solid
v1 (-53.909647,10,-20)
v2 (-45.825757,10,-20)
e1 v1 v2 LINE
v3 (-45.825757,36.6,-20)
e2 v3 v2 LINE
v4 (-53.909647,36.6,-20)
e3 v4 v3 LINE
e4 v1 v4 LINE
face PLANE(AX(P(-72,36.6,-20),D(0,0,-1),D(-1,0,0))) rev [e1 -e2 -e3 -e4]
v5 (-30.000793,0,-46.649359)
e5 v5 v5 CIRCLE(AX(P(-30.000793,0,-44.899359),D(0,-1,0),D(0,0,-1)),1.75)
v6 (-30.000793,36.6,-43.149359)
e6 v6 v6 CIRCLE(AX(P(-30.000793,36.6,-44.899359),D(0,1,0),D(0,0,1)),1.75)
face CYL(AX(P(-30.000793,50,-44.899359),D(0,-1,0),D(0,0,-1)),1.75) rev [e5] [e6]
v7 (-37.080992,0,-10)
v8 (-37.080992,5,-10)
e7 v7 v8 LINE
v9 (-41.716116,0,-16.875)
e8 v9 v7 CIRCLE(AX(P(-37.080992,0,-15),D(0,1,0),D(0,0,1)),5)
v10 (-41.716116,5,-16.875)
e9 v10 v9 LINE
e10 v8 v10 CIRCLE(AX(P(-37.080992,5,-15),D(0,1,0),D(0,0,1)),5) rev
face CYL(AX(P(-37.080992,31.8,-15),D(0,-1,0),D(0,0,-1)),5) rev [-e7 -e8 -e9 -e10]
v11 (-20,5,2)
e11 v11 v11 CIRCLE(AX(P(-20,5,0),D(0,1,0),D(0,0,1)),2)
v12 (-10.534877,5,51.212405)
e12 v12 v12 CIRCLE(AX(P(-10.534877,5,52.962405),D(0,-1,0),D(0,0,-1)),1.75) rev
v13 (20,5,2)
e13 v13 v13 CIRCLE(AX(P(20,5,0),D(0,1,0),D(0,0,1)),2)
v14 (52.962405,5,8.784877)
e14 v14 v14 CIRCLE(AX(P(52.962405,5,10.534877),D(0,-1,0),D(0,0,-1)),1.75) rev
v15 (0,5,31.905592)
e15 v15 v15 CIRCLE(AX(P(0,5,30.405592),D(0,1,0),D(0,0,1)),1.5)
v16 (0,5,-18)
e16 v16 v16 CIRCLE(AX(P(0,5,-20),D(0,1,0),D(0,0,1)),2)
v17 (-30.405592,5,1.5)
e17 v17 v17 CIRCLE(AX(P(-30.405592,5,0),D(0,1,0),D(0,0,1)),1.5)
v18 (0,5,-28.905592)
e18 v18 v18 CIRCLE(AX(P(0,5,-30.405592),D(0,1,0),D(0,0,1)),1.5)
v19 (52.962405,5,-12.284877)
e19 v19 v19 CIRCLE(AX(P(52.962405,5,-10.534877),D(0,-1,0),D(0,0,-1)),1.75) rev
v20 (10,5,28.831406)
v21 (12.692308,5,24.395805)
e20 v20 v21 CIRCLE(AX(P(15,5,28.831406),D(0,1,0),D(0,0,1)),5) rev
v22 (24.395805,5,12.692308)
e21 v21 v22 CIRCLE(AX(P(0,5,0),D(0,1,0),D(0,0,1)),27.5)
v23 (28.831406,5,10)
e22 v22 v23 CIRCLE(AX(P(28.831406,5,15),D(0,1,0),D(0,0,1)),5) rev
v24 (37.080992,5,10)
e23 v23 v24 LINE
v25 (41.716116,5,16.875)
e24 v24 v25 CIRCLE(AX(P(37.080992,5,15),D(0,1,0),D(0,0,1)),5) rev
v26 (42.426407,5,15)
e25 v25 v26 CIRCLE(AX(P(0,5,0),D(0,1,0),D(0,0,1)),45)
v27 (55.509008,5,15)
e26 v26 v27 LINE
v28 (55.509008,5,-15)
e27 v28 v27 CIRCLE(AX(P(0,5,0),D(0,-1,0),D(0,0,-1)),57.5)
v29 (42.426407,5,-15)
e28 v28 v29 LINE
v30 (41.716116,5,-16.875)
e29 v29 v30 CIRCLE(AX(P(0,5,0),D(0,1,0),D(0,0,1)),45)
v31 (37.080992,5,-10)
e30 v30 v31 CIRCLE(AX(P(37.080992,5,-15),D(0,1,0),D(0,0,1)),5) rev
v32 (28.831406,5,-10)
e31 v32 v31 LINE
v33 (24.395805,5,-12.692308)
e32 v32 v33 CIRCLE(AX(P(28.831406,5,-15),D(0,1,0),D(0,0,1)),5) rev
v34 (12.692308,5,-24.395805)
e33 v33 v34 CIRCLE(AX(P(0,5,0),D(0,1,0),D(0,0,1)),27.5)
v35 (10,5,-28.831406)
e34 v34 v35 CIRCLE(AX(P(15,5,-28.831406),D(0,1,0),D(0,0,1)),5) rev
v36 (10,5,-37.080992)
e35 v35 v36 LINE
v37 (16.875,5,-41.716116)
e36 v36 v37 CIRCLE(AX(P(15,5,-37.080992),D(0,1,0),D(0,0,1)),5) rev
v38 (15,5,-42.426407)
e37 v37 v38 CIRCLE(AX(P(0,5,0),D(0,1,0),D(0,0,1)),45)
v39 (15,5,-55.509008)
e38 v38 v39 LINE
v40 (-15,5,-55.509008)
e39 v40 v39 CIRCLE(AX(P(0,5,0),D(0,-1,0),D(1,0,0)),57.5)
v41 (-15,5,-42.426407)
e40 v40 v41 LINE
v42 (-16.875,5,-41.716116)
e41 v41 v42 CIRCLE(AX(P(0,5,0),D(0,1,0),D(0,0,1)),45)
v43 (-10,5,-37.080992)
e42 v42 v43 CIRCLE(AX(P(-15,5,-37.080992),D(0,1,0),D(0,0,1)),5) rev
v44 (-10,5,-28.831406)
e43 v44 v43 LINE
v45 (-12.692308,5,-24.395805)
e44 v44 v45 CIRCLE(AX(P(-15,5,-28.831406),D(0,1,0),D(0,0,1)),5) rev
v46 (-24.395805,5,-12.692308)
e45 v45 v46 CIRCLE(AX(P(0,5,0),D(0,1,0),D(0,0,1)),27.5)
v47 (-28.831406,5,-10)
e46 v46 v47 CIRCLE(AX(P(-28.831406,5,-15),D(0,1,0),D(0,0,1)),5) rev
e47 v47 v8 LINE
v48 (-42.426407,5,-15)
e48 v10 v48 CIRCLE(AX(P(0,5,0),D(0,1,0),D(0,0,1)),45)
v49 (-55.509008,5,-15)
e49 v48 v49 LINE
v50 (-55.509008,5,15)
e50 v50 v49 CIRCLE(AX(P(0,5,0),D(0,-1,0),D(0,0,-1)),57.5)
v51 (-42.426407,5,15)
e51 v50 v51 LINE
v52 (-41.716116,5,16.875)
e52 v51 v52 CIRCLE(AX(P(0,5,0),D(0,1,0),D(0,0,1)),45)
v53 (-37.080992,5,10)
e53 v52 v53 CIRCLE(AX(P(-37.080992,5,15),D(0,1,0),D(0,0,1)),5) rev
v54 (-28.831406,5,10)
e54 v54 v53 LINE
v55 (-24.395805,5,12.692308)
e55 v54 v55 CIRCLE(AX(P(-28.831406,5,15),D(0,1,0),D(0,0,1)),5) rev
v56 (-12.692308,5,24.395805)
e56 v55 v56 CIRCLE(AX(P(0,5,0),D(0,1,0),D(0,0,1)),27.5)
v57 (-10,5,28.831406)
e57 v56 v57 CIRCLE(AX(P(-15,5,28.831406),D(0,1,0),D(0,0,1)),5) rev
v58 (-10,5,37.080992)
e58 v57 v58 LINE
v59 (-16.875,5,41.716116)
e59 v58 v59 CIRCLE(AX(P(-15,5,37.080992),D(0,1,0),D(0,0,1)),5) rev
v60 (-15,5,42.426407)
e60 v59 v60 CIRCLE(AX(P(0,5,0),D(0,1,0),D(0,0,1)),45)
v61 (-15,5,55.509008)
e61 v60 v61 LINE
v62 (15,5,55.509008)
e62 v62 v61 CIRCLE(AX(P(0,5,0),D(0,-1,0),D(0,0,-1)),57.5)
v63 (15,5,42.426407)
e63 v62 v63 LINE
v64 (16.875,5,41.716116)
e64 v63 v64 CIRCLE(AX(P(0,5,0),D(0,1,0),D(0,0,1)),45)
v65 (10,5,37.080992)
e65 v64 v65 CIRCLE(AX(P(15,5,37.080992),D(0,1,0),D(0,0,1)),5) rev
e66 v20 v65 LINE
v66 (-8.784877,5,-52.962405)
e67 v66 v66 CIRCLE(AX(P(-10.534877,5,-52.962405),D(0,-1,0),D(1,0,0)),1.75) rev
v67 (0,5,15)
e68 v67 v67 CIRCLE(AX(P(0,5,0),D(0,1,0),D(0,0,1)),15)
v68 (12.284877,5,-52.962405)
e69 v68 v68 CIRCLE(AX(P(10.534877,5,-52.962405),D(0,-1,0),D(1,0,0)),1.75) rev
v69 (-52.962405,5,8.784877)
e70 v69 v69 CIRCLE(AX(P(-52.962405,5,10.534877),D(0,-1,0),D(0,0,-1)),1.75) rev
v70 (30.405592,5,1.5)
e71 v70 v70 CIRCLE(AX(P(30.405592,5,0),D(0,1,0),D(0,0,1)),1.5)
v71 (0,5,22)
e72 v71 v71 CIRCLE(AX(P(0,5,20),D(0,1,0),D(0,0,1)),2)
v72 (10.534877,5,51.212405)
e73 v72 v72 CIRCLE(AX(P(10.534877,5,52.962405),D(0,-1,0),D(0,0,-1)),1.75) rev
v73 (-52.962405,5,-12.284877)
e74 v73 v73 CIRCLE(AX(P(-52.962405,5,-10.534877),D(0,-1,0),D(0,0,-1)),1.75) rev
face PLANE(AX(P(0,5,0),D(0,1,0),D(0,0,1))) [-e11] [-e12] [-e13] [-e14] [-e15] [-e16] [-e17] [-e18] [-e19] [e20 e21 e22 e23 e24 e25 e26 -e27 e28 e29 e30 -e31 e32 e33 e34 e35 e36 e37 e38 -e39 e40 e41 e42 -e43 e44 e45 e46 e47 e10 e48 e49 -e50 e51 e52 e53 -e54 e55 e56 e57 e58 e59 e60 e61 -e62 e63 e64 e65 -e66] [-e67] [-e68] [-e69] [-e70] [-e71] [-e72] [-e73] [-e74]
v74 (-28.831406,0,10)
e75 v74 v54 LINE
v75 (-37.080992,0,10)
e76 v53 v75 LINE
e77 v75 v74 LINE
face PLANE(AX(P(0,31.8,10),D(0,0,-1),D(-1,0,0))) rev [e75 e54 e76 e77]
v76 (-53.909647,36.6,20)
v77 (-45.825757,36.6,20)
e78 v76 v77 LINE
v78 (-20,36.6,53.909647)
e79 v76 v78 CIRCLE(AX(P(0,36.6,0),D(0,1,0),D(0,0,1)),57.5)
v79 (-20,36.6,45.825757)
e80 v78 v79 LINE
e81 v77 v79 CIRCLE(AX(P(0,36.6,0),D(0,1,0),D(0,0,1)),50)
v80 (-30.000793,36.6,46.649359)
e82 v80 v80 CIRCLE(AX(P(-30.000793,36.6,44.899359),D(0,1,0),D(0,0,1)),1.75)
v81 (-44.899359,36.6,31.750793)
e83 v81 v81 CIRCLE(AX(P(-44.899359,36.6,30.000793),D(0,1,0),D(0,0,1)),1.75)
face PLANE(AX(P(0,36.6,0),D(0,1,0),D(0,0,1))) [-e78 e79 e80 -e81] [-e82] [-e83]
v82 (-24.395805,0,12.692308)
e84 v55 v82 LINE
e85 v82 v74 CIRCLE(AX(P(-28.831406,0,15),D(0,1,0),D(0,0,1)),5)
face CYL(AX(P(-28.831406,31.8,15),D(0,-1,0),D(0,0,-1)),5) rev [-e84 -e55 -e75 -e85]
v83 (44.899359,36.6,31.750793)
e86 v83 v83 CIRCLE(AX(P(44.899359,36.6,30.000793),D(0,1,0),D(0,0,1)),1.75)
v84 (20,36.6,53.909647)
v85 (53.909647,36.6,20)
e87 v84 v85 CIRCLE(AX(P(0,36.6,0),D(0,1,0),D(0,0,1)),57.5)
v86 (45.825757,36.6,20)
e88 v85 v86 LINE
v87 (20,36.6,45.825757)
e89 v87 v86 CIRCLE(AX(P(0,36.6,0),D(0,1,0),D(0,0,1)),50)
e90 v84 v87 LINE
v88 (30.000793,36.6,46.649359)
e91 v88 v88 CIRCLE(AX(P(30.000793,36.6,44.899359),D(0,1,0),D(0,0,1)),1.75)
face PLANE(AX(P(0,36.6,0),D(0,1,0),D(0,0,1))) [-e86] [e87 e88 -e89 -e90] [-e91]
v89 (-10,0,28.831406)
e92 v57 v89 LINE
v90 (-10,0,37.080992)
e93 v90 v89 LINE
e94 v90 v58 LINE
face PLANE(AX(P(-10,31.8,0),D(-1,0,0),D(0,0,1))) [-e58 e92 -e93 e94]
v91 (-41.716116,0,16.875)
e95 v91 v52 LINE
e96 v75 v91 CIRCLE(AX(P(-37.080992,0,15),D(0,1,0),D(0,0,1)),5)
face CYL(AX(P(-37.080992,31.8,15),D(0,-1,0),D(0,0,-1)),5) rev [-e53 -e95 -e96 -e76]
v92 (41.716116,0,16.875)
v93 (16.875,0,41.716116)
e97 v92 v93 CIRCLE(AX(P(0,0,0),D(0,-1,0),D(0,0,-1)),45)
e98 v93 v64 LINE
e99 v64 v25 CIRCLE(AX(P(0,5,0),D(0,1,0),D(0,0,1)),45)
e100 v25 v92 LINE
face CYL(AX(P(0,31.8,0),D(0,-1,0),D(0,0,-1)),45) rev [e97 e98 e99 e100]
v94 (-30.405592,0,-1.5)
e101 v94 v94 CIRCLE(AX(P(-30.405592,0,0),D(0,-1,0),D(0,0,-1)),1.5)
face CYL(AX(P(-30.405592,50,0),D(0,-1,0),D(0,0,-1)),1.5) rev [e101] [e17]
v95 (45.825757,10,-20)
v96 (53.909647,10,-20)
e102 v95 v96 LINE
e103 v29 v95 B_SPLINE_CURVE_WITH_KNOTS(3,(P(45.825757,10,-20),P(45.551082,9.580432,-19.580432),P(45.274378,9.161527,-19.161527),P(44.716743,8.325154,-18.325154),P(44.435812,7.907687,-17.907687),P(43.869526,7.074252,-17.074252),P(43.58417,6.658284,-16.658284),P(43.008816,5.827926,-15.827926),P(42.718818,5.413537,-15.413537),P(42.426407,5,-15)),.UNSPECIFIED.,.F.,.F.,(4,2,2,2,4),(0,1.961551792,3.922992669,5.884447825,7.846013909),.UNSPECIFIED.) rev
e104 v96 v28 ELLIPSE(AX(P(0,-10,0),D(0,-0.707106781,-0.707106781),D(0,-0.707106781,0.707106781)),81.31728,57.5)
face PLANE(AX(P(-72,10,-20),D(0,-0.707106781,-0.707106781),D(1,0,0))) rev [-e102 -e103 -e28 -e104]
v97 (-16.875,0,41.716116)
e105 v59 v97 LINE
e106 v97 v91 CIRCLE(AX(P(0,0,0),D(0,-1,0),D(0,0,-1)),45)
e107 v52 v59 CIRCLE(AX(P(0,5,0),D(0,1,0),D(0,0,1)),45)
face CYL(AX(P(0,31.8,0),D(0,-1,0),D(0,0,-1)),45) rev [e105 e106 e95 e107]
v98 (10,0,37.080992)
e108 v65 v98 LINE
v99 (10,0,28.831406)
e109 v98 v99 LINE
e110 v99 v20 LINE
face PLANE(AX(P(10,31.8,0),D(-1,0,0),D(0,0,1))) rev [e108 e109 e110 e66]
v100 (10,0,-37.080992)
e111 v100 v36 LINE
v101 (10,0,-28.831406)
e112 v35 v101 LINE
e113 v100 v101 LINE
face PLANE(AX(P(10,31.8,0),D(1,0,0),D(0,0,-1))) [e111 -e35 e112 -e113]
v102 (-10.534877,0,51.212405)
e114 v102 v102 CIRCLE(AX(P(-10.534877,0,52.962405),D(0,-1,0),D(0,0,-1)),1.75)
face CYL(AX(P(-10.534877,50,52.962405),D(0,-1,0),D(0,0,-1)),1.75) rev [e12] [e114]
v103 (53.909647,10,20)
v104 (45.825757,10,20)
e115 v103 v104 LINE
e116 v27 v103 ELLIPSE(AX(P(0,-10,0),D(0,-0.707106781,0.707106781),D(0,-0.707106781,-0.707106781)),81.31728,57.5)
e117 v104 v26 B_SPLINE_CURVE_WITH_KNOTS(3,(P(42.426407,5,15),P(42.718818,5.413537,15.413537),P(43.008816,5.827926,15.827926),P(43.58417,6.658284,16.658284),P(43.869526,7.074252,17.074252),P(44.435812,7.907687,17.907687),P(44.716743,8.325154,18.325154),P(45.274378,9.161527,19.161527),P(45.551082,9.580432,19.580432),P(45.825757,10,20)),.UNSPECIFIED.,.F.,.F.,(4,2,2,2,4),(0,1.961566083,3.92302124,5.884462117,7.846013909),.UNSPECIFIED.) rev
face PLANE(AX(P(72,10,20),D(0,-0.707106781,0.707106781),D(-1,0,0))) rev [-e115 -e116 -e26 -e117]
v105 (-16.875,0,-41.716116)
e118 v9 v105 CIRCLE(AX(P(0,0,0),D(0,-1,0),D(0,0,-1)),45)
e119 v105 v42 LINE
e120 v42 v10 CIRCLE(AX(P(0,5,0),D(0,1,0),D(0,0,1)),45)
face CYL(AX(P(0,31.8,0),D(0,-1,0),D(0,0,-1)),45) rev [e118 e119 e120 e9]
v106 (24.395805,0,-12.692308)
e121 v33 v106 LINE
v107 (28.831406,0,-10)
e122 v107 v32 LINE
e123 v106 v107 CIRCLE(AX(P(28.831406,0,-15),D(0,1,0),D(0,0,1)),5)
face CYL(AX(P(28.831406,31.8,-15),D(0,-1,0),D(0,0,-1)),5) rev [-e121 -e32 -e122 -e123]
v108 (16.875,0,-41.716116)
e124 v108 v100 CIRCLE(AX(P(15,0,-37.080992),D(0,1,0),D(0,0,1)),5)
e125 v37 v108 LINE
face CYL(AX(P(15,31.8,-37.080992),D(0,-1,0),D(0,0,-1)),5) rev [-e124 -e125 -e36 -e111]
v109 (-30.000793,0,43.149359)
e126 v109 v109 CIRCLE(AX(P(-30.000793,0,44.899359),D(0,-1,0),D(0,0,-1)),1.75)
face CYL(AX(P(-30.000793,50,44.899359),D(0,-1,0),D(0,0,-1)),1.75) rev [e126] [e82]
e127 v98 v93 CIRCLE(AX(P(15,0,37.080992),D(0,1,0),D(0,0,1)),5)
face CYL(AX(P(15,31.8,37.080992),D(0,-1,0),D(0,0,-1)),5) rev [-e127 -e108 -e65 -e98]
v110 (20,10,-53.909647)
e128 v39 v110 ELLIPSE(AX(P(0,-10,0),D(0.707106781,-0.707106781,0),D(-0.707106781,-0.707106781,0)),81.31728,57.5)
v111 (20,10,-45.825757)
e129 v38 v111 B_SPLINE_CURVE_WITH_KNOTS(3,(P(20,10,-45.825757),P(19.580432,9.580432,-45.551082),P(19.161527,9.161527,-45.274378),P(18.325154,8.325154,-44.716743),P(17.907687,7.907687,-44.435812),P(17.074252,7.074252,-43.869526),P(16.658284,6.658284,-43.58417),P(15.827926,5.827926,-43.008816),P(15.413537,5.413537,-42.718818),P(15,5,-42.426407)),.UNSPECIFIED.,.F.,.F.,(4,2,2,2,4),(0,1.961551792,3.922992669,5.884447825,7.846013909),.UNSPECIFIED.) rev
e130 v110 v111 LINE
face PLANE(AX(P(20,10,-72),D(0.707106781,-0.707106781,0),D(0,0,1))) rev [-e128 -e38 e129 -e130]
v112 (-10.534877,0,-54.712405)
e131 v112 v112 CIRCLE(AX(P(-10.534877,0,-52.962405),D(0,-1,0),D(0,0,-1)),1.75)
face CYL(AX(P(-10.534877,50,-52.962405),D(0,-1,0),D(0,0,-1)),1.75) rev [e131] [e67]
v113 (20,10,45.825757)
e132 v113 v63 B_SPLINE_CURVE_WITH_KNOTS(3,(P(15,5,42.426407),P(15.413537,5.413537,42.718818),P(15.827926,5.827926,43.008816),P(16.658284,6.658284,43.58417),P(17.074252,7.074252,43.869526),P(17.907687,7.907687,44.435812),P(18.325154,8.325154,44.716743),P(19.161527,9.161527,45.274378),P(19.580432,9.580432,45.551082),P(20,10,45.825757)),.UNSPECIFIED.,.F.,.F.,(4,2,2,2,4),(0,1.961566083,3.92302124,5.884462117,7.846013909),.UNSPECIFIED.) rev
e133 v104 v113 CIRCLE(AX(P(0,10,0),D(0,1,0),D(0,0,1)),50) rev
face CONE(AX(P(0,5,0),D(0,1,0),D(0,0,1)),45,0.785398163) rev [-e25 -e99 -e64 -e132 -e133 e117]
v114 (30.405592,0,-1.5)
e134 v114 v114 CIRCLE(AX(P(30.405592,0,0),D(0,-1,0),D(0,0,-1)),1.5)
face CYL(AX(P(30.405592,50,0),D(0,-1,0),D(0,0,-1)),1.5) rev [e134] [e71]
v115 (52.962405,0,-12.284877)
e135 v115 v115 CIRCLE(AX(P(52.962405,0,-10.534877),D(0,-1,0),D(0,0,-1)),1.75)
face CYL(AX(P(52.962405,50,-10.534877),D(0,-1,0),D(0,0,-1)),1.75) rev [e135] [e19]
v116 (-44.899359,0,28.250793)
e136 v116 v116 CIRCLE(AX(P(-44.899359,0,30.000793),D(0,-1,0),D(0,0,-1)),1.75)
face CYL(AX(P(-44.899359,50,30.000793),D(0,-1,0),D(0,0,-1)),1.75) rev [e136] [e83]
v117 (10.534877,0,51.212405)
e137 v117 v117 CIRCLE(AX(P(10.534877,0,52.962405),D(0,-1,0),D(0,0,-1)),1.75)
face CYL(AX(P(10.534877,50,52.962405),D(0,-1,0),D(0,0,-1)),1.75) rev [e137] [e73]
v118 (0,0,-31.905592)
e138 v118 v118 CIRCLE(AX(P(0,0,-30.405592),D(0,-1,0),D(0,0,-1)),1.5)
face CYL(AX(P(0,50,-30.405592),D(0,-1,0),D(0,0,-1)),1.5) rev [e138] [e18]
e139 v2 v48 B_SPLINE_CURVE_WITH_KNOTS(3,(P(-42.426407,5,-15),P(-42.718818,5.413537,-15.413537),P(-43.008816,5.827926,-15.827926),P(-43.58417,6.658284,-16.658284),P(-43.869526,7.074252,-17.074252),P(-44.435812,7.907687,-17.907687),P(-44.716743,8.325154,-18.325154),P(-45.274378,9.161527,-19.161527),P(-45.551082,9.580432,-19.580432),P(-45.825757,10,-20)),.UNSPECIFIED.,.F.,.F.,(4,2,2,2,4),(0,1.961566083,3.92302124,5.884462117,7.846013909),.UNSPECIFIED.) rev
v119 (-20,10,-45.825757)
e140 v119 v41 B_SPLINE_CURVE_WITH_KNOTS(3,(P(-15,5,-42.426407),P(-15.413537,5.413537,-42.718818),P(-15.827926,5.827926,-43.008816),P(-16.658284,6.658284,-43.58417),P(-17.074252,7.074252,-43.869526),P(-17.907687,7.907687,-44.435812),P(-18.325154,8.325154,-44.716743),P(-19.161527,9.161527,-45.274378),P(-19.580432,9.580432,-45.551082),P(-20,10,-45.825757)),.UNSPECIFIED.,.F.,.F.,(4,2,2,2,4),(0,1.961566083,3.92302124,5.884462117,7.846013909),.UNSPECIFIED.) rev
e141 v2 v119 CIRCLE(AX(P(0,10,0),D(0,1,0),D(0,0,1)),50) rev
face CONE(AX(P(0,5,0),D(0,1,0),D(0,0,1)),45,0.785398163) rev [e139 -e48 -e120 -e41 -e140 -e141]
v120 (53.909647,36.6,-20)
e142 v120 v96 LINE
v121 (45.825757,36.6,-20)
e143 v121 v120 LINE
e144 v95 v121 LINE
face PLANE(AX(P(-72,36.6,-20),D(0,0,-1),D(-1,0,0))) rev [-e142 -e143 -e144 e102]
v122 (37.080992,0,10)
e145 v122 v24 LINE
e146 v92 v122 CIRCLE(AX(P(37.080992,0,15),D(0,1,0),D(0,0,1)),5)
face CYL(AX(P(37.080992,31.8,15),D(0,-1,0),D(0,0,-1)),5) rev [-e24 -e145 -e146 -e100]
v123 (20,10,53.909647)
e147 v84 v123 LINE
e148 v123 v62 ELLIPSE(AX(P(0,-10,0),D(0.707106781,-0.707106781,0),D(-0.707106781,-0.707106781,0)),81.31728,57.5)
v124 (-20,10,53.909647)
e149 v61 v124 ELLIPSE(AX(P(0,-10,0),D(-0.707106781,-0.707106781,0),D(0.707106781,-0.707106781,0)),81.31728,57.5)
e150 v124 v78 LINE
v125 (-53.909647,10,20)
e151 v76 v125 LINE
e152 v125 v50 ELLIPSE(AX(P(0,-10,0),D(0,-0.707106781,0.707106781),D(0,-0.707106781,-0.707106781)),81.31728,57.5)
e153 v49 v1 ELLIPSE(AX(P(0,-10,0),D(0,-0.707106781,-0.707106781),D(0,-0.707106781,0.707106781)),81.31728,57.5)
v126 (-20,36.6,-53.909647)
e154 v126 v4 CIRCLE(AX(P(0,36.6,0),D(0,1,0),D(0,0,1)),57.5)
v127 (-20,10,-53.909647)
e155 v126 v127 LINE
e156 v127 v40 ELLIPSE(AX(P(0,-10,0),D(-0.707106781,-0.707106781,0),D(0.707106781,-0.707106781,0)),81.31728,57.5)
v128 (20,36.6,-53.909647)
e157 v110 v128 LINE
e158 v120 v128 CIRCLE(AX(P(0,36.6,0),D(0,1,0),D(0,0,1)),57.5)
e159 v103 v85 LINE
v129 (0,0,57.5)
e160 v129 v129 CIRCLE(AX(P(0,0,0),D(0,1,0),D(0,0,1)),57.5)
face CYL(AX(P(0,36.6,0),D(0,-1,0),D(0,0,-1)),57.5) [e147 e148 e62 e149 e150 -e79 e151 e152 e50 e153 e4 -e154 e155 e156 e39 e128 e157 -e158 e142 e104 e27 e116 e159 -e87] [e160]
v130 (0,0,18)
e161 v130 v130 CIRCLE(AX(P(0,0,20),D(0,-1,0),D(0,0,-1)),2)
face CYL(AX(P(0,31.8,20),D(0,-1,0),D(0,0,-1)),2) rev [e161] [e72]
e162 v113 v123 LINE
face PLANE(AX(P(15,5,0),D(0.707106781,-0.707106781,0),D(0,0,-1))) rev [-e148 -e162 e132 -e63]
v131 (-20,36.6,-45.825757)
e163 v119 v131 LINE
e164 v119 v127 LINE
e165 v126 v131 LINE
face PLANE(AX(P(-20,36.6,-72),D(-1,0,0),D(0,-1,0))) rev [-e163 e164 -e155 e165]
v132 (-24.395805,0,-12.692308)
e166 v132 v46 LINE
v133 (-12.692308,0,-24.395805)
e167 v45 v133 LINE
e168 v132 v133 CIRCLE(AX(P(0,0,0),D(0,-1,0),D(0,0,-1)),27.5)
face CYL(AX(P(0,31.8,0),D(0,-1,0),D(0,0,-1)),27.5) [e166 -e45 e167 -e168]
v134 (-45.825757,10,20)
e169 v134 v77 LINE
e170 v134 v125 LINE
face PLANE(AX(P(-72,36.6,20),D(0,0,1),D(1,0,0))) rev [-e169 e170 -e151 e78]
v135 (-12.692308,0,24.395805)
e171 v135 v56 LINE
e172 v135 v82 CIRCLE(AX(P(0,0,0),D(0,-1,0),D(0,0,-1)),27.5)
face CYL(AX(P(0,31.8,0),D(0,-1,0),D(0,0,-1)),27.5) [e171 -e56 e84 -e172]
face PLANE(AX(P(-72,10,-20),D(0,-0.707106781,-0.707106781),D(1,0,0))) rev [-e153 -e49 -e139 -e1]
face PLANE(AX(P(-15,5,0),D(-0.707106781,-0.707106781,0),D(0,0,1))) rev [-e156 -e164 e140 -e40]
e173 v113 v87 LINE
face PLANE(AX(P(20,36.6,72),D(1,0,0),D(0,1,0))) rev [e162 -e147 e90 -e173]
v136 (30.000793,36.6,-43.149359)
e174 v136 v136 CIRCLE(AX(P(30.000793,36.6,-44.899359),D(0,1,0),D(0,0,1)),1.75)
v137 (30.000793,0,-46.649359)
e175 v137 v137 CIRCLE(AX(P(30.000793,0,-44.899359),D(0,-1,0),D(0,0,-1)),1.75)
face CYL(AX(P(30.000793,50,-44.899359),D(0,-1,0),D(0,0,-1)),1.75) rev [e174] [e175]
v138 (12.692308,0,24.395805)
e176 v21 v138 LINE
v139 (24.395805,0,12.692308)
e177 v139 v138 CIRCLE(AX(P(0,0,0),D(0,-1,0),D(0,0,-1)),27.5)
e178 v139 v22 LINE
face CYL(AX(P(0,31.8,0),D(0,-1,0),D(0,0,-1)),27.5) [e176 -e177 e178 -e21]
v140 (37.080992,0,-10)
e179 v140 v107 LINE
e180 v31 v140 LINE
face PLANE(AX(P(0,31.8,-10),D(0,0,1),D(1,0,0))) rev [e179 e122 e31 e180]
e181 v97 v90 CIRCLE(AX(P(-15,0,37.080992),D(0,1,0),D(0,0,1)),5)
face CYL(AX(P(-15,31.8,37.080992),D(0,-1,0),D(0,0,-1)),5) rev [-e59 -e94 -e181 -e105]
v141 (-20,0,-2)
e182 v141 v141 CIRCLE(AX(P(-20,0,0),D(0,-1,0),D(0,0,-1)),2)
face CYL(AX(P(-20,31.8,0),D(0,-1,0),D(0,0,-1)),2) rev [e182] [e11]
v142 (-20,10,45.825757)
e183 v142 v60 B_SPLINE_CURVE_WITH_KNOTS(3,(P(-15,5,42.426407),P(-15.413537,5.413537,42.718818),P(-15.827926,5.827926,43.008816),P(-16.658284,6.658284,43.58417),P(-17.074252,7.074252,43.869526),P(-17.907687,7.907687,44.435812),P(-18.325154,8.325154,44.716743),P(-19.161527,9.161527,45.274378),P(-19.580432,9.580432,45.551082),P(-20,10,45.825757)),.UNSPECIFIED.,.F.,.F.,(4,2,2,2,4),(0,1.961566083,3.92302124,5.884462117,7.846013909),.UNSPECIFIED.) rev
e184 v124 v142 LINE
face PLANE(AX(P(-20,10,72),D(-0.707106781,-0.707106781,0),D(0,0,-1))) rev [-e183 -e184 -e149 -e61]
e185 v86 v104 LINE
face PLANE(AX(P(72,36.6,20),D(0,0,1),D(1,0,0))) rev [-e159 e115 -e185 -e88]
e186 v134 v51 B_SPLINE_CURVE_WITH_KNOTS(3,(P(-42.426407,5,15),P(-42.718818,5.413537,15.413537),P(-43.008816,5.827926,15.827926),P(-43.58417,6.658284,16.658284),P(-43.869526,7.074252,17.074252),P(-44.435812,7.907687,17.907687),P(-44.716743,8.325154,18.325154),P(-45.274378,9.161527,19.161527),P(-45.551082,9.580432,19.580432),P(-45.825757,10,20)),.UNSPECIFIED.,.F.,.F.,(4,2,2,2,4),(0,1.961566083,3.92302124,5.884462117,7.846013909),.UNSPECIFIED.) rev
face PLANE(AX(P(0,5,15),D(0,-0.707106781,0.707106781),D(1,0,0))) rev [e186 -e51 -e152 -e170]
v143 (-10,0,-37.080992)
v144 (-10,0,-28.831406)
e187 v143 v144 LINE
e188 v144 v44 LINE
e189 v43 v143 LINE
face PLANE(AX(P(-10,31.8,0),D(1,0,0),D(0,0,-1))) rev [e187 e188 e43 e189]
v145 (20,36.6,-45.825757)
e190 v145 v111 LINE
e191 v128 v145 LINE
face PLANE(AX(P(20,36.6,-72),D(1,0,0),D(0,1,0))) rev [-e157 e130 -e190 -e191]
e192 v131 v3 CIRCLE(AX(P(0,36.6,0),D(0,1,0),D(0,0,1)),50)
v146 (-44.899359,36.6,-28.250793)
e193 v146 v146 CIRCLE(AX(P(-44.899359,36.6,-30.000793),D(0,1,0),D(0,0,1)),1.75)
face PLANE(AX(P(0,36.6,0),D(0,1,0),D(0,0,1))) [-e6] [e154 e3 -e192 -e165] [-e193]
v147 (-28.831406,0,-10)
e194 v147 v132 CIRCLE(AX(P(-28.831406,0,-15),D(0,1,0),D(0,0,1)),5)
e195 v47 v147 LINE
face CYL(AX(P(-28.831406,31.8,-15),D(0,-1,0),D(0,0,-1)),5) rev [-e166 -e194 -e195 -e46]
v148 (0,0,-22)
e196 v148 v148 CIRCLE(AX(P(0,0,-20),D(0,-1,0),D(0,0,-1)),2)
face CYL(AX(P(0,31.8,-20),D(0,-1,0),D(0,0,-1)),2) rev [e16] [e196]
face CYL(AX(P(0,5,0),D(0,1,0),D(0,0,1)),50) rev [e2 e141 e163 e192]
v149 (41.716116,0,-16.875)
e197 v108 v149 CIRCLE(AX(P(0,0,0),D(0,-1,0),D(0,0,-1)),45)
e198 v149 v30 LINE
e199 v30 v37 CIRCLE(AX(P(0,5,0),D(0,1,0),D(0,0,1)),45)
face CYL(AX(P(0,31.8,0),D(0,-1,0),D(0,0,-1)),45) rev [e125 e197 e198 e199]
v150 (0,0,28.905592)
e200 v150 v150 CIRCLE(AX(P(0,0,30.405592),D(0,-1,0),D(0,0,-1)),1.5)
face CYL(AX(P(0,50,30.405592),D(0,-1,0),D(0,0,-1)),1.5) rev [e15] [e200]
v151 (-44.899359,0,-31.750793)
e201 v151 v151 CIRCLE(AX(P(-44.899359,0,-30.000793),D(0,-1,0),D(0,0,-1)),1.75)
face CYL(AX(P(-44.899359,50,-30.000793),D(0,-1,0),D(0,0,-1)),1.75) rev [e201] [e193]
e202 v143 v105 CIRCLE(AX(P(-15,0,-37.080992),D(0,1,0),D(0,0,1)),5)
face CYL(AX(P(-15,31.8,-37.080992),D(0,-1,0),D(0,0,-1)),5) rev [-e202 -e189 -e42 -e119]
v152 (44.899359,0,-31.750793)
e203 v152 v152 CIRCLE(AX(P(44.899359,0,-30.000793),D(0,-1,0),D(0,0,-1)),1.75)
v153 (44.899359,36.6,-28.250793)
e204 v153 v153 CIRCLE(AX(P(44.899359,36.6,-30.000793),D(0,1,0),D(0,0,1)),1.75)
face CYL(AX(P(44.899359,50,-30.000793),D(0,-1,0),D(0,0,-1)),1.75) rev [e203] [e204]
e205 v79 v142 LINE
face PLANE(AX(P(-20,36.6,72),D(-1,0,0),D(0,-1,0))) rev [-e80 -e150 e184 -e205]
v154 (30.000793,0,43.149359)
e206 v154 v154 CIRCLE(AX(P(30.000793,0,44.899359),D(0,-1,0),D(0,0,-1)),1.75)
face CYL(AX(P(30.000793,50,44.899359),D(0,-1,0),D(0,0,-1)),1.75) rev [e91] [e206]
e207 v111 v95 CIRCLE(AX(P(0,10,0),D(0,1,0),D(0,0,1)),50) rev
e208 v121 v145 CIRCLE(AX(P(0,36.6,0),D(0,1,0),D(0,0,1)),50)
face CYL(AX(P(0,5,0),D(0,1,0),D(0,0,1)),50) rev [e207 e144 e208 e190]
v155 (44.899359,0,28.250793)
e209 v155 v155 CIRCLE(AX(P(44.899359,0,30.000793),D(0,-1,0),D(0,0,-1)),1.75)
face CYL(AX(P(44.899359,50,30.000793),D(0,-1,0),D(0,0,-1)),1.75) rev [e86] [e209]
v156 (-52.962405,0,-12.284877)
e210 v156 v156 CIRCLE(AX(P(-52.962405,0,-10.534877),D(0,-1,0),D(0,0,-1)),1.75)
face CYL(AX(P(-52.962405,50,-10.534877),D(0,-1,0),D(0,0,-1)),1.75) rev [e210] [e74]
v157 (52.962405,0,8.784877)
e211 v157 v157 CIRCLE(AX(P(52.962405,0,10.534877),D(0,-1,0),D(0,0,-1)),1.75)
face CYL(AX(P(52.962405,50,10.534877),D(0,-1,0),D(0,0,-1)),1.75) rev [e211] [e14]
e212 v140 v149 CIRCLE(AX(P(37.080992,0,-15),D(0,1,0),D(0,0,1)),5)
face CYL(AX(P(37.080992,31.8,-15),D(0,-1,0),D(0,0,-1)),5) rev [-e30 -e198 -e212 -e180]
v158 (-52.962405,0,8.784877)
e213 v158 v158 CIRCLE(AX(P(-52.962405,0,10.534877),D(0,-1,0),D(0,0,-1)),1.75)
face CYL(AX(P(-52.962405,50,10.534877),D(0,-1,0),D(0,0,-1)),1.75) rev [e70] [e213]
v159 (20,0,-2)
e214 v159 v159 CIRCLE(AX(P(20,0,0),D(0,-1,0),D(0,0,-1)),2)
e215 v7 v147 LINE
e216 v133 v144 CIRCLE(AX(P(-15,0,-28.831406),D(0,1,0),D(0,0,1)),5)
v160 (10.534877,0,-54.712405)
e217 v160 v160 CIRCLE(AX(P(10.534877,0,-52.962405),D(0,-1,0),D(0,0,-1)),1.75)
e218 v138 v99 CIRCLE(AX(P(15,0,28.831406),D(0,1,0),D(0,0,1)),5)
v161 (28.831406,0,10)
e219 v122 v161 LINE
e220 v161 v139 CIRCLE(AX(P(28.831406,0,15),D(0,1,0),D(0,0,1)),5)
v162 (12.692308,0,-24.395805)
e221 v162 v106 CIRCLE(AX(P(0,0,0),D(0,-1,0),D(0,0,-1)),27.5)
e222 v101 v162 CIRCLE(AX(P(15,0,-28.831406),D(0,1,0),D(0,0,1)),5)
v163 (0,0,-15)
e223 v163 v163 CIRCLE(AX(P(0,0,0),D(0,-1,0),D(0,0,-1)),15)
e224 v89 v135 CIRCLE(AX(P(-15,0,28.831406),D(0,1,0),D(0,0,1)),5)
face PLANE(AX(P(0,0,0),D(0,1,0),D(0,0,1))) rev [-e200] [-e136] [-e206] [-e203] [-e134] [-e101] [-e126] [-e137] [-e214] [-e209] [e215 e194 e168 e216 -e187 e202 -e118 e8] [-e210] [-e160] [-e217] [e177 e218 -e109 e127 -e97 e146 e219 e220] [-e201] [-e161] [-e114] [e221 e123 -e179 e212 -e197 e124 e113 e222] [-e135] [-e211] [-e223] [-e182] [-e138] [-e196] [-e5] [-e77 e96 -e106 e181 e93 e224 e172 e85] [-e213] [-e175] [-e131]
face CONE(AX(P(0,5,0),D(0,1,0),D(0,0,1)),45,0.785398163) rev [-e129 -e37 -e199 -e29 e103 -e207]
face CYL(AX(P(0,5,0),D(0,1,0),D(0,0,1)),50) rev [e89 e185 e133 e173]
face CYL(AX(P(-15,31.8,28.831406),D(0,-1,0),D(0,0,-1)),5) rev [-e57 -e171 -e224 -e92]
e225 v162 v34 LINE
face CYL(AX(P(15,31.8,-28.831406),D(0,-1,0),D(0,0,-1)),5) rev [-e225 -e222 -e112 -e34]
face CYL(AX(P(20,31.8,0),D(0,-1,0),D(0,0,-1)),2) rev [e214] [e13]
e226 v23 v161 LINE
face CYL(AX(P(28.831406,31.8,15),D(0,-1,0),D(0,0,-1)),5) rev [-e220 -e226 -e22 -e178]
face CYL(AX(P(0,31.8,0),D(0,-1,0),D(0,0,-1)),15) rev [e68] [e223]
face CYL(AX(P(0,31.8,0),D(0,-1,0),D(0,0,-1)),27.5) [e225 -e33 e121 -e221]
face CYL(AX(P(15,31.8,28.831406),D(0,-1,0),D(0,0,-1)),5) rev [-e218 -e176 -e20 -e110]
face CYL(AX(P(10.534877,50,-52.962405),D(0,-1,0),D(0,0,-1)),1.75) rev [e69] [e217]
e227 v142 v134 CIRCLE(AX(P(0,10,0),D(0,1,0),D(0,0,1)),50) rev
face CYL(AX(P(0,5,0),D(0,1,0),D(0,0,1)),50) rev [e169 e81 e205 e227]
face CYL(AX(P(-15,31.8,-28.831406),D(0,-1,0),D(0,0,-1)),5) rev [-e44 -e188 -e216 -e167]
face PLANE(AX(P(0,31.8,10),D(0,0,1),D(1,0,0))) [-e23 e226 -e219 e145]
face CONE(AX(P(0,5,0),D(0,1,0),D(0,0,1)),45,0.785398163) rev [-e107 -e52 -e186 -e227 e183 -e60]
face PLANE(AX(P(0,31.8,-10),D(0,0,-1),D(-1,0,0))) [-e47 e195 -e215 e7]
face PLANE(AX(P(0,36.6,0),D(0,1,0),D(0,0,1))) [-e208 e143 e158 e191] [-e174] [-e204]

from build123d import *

# Parameters (mm, degrees)
SKETCH1_R           = 57.5
BOSS_EXTRUDE1_DEPTH = 36.6
SKETCH2_R           = 50
CUT_EXTRUDE1_DEPTH  = 31.6
SKETCH3_R           = 2
SKETCH3_R_2         = 15
CUT_EXTRUDE2_DEPTH  = 31.8
SKETCH4_R           = 1.5
SKETCH4_R_2         = 1.75
CUT_EXTRUDE3_DEPTH  = 50
SKETCH9_W           = 40
SKETCH9_H           = 31.6
CUT_EXTRUDE4_DEPTH  = 72
CIRPATTERN1_COUNT   = 4
FILLET2_R           = 5
CHAMFER1_SIZE       = 5


with BuildPart() as part:
    # Sketch1 → Boss-Extrude1 (new body)
    with BuildSketch(Plane(origin=(0, 0, 0), x_dir=(1, 0, 0), z_dir=(0, 1, 0))):
        with Locations(Location((0, 0, 0), (0, 0, 270))):
            Circle(SKETCH1_R)
    extrude(amount=BOSS_EXTRUDE1_DEPTH)

    # Sketch2 → Cut-Extrude1 (cut)
    with BuildSketch(Plane(origin=(0, 36.6, 0), x_dir=(1, 0, 0), z_dir=(0, 1, 0))):
        with Locations(Location((0, 0, 0), (0, 0, 270))):
            Circle(SKETCH2_R)
    extrude(amount=-CUT_EXTRUDE1_DEPTH, mode=Mode.SUBTRACT)

    # Sketch3 → Cut-Extrude2 (cut)
    with BuildSketch(Plane.XZ):
        with BuildLine():
            Line((-10, 25.617376915), (-10, 43.874821937))
            ThreePointArc((-10, 43.874821937), (-31.819805153, 31.819805153), (-43.874821937, 10))
            Line((-43.874821937, 10), (-25.617376915, 10))
            ThreePointArc((-25.617376915, 10), (-19.445436483, 19.445436483), (-10, 25.617376915))
        make_face()
        with BuildLine():
            Line((25.617376915, 10), (43.874821937, 10))
            ThreePointArc((43.874821937, 10), (31.819805153, 31.819805153), (10, 43.874821937))
            Line((10, 43.874821937), (10, 25.617376915))
            ThreePointArc((10, 25.617376915), (19.445436483, 19.445436483), (25.617376915, 10))
        make_face()
        with BuildLine():
            ThreePointArc((10, -43.874821937), (31.819805153, -31.819805153), (43.874821937, -10))
            Line((43.874821937, -10), (25.617376915, -10))
            ThreePointArc((25.617376915, -10), (19.445436483, -19.445436483), (10, -25.617376915))
            Line((10, -25.617376915), (10, -43.874821937))
        make_face()
        with BuildLine():
            ThreePointArc((-43.874821937, -10), (-31.819805153, -31.819805153), (-10, -43.874821937))
            Line((-10, -43.874821937), (-10, -25.617376915))
            ThreePointArc((-10, -25.617376915), (-19.445436483, -19.445436483), (-25.617376915, -10))
            Line((-25.617376915, -10), (-43.874821937, -10))
        make_face()
        with Locations(Location((-20, 0, 0), (0, 0, 270))):
            Circle(SKETCH3_R)
        with Locations(Location((0, 0, 0), (0, 0, 270))):
            Circle(SKETCH3_R_2)
        with Locations(Location((0, 20, 0), (0, 0, 270))):
            Circle(SKETCH3_R)
        with Locations(Location((20, 0, 0), (0, 0, 270))):
            Circle(SKETCH3_R)
        with Locations(Location((0, -20, 0), (0, 0, 270))):
            Circle(SKETCH3_R)
    extrude(amount=-CUT_EXTRUDE2_DEPTH, mode=Mode.SUBTRACT)

    # Sketch4 → Cut-Extrude3 (cut)
    with BuildSketch(Plane.XZ):
        with Locations(Location((0, 30.405591591, 0), (0, 0, 270))):
            Circle(SKETCH4_R)
        with Locations(Location((30.405591591, 0, 0), (0, 0, 270))):
            Circle(SKETCH4_R)
        with Locations(Location((0, -30.405591591, 0), (0, 0, 270))):
            Circle(SKETCH4_R)
        with Locations(Location((-30.405591591, 0, 0), (0, 0, 270))):
            Circle(SKETCH4_R)
        with Locations(Location((-10.534877389, 52.962405142, 0), (0, 0, 270))):
            Circle(SKETCH4_R_2)
        with Locations(Location((10.534877389, 52.962405142, 0), (0, 0, 270))):
            Circle(SKETCH4_R_2)
        with Locations(Location((30.000792583, 44.899359064, 0), (0, 0, 270))):
            Circle(SKETCH4_R_2)
        with Locations(Location((44.899359064, 30.000792583, 0), (0, 0, 270))):
            Circle(SKETCH4_R_2)
        with Locations(Location((52.962405142, 10.534877389, 0), (0, 0, 270))):
            Circle(SKETCH4_R_2)
        with Locations(Location((52.962405142, -10.534877389, 0), (0, 0, 270))):
            Circle(SKETCH4_R_2)
        with Locations(Location((44.899359064, -30.000792583, 0), (0, 0, 270))):
            Circle(SKETCH4_R_2)
        with Locations(Location((30.000792583, -44.899359064, 0), (0, 0, 270))):
            Circle(SKETCH4_R_2)
        with Locations(Location((10.534877389, -52.962405142, 0), (0, 0, 270))):
            Circle(SKETCH4_R_2)
        with Locations(Location((-10.534877389, -52.962405142, 0), (0, 0, 270))):
            Circle(SKETCH4_R_2)
        with Locations(Location((-30.000792583, -44.899359064, 0), (0, 0, 270))):
            Circle(SKETCH4_R_2)
        with Locations(Location((-44.899359064, -30.000792583, 0), (0, 0, 270))):
            Circle(SKETCH4_R_2)
        with Locations(Location((-52.962405142, -10.534877389, 0), (0, 0, 270))):
            Circle(SKETCH4_R_2)
        with Locations(Location((-52.962405142, 10.534877389, 0), (0, 0, 270))):
            Circle(SKETCH4_R_2)
        with Locations(Location((-44.899359064, 30.000792583, 0), (0, 0, 270))):
            Circle(SKETCH4_R_2)
        with Locations(Location((-30.000792583, 44.899359064, 0), (0, 0, 270))):
            Circle(SKETCH4_R_2)
    extrude(amount=-CUT_EXTRUDE3_DEPTH, mode=Mode.SUBTRACT)

    # Sketch9 → Cut-Extrude4 (cut)
    with BuildSketch(Plane.XY):
        with Locations((0, 20.8)):
            Rectangle(SKETCH9_W, SKETCH9_H)
    cut_extrude4 = extrude(amount=-CUT_EXTRUDE4_DEPTH, mode=Mode.SUBTRACT)

    # CirPattern1: Cut-Extrude4 ×4 about axis
    cirpattern1_axis = Axis((0, 0, 0), (0, 1, 0))
    for i in range(1, CIRPATTERN1_COUNT):
        add(cut_extrude4.rotate(cirpattern1_axis, i * 360 / CIRPATTERN1_COUNT), mode=Mode.SUBTRACT)

    # Fillet2
    fillet2_edges = [part.edges().sort_by_distance(p)[0] for p in [
        (43.874821937, 2.5, 10),
        (25.617376915, 2.5, 10),
        (10, 2.5, 25.617376915),
        (10, 2.5, 43.874821937),
        (10, 2.5, -43.874821937),
        (10, 2.5, -25.617376915),
        (25.617376915, 2.5, -10),
        (43.874821937, 2.5, -10),
        (-43.874821937, 2.5, -10),
        (-25.617376915, 2.5, -10),
        (-10, 2.5, -25.617376915),
        (-10, 2.5, -43.874821937),
        (-10, 2.5, 43.874821937),
        (-10, 2.5, 25.617376915),
        (-25.617376915, 2.5, 10),
        (-43.874821937, 2.5, 10),
    ]]
    fillet(fillet2_edges, radius=FILLET2_R)

    # Chamfer1
    chamfer1_edges = [part.edges().sort_by_distance(p)[0] for p in [
        (-35.355339059, 5, -35.355339059),
        (-20, 5, -49.867701791),
        (20, 5, -49.867701791),
        (-35.355339059, 5, 35.355339059),
        (35.355339059, 5, 35.355339059),
        (35.355339059, 5, -35.355339059),
        (-49.867701791, 5, 20),
        (20, 5, 49.867701791),
        (49.867701791, 5, -20),
        (49.867701791, 5, 20),
        (-20, 5, 49.867701791),
        (-49.867701791, 5, -20),
    ]]
    chamfer(chamfer1_edges, length=CHAMFER1_SIZE - 0.0001)  # a hair under: the kernel refuses the full size


solid = part.part
